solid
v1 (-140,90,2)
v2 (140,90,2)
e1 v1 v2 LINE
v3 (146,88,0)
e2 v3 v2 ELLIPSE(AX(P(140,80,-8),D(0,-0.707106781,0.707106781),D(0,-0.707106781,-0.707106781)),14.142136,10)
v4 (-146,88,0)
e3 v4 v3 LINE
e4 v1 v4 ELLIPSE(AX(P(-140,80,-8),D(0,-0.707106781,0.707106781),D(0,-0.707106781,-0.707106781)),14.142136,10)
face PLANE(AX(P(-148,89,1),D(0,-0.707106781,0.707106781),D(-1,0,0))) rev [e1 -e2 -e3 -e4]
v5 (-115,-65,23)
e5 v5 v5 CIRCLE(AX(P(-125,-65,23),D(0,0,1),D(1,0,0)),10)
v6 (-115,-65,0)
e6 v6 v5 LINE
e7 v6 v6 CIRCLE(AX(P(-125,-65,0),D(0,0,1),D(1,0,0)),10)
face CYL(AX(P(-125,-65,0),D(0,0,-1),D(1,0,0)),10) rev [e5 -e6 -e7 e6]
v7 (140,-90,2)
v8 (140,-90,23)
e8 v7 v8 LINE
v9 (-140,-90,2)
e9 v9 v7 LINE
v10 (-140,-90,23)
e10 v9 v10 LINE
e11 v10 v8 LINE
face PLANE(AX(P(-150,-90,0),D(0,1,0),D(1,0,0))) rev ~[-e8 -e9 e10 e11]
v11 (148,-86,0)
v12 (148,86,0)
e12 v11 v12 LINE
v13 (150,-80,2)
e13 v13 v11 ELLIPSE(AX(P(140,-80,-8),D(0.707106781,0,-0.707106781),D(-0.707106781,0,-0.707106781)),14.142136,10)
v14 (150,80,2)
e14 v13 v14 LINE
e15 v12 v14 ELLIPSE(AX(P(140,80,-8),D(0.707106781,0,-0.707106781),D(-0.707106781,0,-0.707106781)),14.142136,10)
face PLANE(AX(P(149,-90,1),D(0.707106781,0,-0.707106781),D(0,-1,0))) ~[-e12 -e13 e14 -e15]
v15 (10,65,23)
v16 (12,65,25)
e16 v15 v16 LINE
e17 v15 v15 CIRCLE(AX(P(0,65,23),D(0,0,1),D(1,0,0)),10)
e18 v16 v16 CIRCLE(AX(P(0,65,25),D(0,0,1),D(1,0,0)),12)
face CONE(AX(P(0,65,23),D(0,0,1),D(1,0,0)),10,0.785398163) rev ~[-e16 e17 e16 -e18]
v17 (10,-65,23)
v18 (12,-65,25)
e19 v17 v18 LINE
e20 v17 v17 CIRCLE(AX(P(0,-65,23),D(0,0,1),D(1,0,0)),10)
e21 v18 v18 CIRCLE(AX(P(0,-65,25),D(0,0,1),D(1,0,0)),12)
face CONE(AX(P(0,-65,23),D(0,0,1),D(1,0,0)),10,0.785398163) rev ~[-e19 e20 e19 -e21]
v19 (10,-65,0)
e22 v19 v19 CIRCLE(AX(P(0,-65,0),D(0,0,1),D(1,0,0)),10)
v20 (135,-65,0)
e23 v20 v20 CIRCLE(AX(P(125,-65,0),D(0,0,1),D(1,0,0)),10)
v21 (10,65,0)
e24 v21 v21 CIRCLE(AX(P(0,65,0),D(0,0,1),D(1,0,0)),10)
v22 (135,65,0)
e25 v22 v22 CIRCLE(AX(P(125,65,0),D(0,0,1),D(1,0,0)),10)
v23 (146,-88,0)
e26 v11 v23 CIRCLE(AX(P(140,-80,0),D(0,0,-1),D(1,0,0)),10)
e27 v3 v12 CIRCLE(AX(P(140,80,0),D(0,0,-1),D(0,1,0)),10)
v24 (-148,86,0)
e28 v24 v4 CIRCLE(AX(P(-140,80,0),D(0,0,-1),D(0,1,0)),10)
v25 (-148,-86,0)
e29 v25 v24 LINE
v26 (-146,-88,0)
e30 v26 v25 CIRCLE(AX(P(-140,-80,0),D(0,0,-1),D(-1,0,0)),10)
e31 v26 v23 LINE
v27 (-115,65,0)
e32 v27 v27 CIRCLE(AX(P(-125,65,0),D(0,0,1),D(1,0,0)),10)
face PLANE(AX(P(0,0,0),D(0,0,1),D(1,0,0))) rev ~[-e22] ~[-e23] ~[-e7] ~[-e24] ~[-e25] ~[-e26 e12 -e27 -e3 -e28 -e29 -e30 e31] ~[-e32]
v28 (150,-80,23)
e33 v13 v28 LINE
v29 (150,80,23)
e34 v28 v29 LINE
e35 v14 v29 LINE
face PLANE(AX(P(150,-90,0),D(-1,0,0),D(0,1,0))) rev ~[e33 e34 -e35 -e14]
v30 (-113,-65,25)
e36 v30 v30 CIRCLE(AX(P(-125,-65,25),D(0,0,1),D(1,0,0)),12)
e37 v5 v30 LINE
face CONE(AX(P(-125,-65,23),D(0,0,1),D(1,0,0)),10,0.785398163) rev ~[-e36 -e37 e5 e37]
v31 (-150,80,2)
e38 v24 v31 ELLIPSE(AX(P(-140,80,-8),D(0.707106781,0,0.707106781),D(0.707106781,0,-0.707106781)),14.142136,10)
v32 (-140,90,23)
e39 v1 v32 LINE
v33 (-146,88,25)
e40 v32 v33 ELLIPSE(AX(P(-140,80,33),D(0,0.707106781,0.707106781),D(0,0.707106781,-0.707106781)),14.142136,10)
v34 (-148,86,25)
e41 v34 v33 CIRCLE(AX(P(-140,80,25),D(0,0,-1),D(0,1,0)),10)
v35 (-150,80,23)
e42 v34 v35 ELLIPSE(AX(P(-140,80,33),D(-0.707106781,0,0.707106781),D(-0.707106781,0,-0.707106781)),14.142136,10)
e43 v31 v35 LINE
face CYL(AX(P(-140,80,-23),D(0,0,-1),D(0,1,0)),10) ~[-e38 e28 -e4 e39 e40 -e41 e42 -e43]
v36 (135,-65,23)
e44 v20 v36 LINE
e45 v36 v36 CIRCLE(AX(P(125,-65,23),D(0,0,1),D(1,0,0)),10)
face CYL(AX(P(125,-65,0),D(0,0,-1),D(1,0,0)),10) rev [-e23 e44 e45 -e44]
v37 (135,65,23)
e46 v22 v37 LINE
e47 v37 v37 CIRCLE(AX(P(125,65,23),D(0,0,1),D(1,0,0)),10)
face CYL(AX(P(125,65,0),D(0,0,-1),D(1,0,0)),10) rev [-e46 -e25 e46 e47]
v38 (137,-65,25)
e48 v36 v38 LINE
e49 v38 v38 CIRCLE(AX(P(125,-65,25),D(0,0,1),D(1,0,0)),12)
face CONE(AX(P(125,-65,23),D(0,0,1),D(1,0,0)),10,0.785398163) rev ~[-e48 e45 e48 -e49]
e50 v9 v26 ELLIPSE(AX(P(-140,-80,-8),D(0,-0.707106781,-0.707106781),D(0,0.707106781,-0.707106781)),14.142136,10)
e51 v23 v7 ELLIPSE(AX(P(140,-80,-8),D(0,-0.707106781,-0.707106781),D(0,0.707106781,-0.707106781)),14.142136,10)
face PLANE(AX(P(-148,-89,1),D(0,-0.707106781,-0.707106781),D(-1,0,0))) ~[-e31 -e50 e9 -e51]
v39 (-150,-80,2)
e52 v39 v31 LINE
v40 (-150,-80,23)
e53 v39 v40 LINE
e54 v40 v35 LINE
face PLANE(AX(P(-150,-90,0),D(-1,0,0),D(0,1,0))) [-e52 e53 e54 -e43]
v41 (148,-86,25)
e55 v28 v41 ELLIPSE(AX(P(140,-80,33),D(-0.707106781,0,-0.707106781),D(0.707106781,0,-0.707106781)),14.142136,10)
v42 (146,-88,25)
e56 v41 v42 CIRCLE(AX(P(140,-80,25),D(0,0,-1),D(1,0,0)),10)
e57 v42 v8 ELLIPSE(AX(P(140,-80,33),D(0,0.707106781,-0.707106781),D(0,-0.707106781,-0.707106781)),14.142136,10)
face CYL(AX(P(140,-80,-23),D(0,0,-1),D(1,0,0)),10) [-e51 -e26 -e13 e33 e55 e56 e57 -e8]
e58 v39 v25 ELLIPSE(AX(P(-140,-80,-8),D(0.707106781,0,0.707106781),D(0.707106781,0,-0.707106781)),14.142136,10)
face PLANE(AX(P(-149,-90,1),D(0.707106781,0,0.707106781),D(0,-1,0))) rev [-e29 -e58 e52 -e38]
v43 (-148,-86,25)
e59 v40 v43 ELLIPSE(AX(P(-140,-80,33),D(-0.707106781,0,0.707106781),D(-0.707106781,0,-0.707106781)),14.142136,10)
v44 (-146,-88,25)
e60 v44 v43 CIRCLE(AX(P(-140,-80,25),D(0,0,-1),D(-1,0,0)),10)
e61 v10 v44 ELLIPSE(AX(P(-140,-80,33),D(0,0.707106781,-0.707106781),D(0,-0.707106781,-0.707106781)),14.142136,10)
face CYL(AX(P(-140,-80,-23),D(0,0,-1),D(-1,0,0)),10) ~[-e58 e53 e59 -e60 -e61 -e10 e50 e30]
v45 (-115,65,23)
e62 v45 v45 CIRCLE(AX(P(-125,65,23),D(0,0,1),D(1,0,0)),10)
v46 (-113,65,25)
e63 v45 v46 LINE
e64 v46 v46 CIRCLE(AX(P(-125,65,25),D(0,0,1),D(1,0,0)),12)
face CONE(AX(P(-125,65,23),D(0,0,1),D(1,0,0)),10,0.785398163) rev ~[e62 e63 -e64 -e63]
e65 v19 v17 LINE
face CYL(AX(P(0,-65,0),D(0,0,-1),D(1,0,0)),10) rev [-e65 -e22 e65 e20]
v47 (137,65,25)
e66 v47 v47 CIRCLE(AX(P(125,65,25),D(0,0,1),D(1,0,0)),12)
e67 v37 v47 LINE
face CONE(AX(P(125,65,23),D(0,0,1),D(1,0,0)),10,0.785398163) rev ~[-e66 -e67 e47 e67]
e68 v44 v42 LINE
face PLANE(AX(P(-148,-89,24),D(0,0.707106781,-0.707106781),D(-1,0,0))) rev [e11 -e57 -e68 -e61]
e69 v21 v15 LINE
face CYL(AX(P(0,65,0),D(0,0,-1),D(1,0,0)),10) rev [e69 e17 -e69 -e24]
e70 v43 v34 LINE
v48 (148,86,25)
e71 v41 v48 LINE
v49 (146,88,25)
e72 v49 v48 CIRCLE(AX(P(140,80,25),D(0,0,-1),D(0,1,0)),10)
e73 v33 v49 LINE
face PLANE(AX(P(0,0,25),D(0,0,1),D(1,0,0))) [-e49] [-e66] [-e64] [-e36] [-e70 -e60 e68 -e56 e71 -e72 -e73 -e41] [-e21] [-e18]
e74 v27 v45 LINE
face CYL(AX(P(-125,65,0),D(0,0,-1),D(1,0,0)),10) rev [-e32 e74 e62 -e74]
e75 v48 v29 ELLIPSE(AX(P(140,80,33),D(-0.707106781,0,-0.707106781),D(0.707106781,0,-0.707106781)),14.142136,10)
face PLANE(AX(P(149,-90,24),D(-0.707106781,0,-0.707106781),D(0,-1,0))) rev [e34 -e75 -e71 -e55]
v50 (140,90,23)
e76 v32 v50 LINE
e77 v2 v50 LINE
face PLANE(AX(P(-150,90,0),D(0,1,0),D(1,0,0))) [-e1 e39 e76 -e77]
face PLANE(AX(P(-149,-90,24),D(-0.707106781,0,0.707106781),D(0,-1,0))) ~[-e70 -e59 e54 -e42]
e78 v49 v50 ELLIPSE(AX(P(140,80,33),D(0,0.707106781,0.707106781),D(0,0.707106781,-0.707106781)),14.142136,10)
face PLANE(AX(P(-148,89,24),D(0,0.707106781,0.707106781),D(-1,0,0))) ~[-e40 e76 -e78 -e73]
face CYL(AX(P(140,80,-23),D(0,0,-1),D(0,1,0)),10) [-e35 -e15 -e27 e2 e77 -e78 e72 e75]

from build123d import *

# Parameters (mm, degrees)
F0_W        = 300
F0_H        = 180
F0_R        = 10
F1_DEPTH    = 25
F2_SIZE2    = 2
F2_SIZE     = 2
F3_SIZE2    = 2
F3_SIZE     = 2
F4_T1_DEPTH = 71


# Not quite as in the source:
# - a fillet or chamfer that OpenCascade refuses, or shapes differently, is made with other operations: its cross-section is extruded or revolved along the edge and cut away or added


with BuildPart() as f1:
    # F0 (on Top) → F1 (new body)
    with BuildSketch(Plane.XY):
        Rectangle(F0_W, F0_H)
        with Locations((-125, -65)):
            Circle(F0_R, mode=Mode.SUBTRACT)
        with Locations((0, -65)):
            Circle(F0_R, mode=Mode.SUBTRACT)
        with Locations((125, -65)):
            Circle(F0_R, mode=Mode.SUBTRACT)
        with Locations((-125, 65)):
            Circle(F0_R, mode=Mode.SUBTRACT)
        with Locations((0, 65)):
            Circle(F0_R, mode=Mode.SUBTRACT)
        with Locations((125, 65)):
            Circle(F0_R, mode=Mode.SUBTRACT)
    extrude(amount=F1_DEPTH)

    # F2
    f2_edges = [f1.edges().sort_by_distance(p)[0] for p in [
        (-135, -65, 25),
        (-135, 65, 25),
        (-10, -65, 25),
        (-10, 65, 25),
        (115, 65, 25),
        (115, -65, 25),
        (-150, 0, 25),
        (-150, 0, 0),
        (150, 0, 25),
        (150, 0, 0),
    ]]
    chamfer(f2_edges, length=F2_SIZE, length2=F2_SIZE2)

    # F3
    f3_edges = [f1.edges().sort_by_distance(p)[0] for p in [
        (0, -90, 25),
        (0, -90, 0),
        (0, 90, 25),
        (0, 90, 0),
    ]]
    chamfer(f3_edges, length=F3_SIZE, length2=F3_SIZE2)

    # F4: fillet of radius 10 on 4 edges, made by hand

    # F4_s2 → F4_t1 (cut)
    with BuildSketch(Plane.XY.offset(-23)):
        with BuildLine():
            ThreePointArc((150, -80), (147.0710678119, -87.0710678119), (140, -90))
            Line((140, -90), (150, -90))
            Line((150, -90), (150, -80))
        make_face()
        with BuildLine():
            ThreePointArc((-150, -80), (-147.0710678119, -87.0710678119), (-140, -90))
            Line((-140, -90), (-150, -90))
            Line((-150, -90), (-150, -80))
        make_face()
        with BuildLine():
            ThreePointArc((-140, 90), (-147.0710678119, 87.0710678119), (-150, 80))
            Line((-150, 80), (-150, 90))
            Line((-150, 90), (-140, 90))
        make_face()
        with BuildLine():
            ThreePointArc((140, 90), (147.0710678119, 87.0710678119), (150, 80))
            Line((150, 80), (150, 90))
            Line((150, 90), (140, 90))
        make_face()
    extrude(amount=F4_T1_DEPTH, mode=Mode.SUBTRACT)


solid = f1.part
